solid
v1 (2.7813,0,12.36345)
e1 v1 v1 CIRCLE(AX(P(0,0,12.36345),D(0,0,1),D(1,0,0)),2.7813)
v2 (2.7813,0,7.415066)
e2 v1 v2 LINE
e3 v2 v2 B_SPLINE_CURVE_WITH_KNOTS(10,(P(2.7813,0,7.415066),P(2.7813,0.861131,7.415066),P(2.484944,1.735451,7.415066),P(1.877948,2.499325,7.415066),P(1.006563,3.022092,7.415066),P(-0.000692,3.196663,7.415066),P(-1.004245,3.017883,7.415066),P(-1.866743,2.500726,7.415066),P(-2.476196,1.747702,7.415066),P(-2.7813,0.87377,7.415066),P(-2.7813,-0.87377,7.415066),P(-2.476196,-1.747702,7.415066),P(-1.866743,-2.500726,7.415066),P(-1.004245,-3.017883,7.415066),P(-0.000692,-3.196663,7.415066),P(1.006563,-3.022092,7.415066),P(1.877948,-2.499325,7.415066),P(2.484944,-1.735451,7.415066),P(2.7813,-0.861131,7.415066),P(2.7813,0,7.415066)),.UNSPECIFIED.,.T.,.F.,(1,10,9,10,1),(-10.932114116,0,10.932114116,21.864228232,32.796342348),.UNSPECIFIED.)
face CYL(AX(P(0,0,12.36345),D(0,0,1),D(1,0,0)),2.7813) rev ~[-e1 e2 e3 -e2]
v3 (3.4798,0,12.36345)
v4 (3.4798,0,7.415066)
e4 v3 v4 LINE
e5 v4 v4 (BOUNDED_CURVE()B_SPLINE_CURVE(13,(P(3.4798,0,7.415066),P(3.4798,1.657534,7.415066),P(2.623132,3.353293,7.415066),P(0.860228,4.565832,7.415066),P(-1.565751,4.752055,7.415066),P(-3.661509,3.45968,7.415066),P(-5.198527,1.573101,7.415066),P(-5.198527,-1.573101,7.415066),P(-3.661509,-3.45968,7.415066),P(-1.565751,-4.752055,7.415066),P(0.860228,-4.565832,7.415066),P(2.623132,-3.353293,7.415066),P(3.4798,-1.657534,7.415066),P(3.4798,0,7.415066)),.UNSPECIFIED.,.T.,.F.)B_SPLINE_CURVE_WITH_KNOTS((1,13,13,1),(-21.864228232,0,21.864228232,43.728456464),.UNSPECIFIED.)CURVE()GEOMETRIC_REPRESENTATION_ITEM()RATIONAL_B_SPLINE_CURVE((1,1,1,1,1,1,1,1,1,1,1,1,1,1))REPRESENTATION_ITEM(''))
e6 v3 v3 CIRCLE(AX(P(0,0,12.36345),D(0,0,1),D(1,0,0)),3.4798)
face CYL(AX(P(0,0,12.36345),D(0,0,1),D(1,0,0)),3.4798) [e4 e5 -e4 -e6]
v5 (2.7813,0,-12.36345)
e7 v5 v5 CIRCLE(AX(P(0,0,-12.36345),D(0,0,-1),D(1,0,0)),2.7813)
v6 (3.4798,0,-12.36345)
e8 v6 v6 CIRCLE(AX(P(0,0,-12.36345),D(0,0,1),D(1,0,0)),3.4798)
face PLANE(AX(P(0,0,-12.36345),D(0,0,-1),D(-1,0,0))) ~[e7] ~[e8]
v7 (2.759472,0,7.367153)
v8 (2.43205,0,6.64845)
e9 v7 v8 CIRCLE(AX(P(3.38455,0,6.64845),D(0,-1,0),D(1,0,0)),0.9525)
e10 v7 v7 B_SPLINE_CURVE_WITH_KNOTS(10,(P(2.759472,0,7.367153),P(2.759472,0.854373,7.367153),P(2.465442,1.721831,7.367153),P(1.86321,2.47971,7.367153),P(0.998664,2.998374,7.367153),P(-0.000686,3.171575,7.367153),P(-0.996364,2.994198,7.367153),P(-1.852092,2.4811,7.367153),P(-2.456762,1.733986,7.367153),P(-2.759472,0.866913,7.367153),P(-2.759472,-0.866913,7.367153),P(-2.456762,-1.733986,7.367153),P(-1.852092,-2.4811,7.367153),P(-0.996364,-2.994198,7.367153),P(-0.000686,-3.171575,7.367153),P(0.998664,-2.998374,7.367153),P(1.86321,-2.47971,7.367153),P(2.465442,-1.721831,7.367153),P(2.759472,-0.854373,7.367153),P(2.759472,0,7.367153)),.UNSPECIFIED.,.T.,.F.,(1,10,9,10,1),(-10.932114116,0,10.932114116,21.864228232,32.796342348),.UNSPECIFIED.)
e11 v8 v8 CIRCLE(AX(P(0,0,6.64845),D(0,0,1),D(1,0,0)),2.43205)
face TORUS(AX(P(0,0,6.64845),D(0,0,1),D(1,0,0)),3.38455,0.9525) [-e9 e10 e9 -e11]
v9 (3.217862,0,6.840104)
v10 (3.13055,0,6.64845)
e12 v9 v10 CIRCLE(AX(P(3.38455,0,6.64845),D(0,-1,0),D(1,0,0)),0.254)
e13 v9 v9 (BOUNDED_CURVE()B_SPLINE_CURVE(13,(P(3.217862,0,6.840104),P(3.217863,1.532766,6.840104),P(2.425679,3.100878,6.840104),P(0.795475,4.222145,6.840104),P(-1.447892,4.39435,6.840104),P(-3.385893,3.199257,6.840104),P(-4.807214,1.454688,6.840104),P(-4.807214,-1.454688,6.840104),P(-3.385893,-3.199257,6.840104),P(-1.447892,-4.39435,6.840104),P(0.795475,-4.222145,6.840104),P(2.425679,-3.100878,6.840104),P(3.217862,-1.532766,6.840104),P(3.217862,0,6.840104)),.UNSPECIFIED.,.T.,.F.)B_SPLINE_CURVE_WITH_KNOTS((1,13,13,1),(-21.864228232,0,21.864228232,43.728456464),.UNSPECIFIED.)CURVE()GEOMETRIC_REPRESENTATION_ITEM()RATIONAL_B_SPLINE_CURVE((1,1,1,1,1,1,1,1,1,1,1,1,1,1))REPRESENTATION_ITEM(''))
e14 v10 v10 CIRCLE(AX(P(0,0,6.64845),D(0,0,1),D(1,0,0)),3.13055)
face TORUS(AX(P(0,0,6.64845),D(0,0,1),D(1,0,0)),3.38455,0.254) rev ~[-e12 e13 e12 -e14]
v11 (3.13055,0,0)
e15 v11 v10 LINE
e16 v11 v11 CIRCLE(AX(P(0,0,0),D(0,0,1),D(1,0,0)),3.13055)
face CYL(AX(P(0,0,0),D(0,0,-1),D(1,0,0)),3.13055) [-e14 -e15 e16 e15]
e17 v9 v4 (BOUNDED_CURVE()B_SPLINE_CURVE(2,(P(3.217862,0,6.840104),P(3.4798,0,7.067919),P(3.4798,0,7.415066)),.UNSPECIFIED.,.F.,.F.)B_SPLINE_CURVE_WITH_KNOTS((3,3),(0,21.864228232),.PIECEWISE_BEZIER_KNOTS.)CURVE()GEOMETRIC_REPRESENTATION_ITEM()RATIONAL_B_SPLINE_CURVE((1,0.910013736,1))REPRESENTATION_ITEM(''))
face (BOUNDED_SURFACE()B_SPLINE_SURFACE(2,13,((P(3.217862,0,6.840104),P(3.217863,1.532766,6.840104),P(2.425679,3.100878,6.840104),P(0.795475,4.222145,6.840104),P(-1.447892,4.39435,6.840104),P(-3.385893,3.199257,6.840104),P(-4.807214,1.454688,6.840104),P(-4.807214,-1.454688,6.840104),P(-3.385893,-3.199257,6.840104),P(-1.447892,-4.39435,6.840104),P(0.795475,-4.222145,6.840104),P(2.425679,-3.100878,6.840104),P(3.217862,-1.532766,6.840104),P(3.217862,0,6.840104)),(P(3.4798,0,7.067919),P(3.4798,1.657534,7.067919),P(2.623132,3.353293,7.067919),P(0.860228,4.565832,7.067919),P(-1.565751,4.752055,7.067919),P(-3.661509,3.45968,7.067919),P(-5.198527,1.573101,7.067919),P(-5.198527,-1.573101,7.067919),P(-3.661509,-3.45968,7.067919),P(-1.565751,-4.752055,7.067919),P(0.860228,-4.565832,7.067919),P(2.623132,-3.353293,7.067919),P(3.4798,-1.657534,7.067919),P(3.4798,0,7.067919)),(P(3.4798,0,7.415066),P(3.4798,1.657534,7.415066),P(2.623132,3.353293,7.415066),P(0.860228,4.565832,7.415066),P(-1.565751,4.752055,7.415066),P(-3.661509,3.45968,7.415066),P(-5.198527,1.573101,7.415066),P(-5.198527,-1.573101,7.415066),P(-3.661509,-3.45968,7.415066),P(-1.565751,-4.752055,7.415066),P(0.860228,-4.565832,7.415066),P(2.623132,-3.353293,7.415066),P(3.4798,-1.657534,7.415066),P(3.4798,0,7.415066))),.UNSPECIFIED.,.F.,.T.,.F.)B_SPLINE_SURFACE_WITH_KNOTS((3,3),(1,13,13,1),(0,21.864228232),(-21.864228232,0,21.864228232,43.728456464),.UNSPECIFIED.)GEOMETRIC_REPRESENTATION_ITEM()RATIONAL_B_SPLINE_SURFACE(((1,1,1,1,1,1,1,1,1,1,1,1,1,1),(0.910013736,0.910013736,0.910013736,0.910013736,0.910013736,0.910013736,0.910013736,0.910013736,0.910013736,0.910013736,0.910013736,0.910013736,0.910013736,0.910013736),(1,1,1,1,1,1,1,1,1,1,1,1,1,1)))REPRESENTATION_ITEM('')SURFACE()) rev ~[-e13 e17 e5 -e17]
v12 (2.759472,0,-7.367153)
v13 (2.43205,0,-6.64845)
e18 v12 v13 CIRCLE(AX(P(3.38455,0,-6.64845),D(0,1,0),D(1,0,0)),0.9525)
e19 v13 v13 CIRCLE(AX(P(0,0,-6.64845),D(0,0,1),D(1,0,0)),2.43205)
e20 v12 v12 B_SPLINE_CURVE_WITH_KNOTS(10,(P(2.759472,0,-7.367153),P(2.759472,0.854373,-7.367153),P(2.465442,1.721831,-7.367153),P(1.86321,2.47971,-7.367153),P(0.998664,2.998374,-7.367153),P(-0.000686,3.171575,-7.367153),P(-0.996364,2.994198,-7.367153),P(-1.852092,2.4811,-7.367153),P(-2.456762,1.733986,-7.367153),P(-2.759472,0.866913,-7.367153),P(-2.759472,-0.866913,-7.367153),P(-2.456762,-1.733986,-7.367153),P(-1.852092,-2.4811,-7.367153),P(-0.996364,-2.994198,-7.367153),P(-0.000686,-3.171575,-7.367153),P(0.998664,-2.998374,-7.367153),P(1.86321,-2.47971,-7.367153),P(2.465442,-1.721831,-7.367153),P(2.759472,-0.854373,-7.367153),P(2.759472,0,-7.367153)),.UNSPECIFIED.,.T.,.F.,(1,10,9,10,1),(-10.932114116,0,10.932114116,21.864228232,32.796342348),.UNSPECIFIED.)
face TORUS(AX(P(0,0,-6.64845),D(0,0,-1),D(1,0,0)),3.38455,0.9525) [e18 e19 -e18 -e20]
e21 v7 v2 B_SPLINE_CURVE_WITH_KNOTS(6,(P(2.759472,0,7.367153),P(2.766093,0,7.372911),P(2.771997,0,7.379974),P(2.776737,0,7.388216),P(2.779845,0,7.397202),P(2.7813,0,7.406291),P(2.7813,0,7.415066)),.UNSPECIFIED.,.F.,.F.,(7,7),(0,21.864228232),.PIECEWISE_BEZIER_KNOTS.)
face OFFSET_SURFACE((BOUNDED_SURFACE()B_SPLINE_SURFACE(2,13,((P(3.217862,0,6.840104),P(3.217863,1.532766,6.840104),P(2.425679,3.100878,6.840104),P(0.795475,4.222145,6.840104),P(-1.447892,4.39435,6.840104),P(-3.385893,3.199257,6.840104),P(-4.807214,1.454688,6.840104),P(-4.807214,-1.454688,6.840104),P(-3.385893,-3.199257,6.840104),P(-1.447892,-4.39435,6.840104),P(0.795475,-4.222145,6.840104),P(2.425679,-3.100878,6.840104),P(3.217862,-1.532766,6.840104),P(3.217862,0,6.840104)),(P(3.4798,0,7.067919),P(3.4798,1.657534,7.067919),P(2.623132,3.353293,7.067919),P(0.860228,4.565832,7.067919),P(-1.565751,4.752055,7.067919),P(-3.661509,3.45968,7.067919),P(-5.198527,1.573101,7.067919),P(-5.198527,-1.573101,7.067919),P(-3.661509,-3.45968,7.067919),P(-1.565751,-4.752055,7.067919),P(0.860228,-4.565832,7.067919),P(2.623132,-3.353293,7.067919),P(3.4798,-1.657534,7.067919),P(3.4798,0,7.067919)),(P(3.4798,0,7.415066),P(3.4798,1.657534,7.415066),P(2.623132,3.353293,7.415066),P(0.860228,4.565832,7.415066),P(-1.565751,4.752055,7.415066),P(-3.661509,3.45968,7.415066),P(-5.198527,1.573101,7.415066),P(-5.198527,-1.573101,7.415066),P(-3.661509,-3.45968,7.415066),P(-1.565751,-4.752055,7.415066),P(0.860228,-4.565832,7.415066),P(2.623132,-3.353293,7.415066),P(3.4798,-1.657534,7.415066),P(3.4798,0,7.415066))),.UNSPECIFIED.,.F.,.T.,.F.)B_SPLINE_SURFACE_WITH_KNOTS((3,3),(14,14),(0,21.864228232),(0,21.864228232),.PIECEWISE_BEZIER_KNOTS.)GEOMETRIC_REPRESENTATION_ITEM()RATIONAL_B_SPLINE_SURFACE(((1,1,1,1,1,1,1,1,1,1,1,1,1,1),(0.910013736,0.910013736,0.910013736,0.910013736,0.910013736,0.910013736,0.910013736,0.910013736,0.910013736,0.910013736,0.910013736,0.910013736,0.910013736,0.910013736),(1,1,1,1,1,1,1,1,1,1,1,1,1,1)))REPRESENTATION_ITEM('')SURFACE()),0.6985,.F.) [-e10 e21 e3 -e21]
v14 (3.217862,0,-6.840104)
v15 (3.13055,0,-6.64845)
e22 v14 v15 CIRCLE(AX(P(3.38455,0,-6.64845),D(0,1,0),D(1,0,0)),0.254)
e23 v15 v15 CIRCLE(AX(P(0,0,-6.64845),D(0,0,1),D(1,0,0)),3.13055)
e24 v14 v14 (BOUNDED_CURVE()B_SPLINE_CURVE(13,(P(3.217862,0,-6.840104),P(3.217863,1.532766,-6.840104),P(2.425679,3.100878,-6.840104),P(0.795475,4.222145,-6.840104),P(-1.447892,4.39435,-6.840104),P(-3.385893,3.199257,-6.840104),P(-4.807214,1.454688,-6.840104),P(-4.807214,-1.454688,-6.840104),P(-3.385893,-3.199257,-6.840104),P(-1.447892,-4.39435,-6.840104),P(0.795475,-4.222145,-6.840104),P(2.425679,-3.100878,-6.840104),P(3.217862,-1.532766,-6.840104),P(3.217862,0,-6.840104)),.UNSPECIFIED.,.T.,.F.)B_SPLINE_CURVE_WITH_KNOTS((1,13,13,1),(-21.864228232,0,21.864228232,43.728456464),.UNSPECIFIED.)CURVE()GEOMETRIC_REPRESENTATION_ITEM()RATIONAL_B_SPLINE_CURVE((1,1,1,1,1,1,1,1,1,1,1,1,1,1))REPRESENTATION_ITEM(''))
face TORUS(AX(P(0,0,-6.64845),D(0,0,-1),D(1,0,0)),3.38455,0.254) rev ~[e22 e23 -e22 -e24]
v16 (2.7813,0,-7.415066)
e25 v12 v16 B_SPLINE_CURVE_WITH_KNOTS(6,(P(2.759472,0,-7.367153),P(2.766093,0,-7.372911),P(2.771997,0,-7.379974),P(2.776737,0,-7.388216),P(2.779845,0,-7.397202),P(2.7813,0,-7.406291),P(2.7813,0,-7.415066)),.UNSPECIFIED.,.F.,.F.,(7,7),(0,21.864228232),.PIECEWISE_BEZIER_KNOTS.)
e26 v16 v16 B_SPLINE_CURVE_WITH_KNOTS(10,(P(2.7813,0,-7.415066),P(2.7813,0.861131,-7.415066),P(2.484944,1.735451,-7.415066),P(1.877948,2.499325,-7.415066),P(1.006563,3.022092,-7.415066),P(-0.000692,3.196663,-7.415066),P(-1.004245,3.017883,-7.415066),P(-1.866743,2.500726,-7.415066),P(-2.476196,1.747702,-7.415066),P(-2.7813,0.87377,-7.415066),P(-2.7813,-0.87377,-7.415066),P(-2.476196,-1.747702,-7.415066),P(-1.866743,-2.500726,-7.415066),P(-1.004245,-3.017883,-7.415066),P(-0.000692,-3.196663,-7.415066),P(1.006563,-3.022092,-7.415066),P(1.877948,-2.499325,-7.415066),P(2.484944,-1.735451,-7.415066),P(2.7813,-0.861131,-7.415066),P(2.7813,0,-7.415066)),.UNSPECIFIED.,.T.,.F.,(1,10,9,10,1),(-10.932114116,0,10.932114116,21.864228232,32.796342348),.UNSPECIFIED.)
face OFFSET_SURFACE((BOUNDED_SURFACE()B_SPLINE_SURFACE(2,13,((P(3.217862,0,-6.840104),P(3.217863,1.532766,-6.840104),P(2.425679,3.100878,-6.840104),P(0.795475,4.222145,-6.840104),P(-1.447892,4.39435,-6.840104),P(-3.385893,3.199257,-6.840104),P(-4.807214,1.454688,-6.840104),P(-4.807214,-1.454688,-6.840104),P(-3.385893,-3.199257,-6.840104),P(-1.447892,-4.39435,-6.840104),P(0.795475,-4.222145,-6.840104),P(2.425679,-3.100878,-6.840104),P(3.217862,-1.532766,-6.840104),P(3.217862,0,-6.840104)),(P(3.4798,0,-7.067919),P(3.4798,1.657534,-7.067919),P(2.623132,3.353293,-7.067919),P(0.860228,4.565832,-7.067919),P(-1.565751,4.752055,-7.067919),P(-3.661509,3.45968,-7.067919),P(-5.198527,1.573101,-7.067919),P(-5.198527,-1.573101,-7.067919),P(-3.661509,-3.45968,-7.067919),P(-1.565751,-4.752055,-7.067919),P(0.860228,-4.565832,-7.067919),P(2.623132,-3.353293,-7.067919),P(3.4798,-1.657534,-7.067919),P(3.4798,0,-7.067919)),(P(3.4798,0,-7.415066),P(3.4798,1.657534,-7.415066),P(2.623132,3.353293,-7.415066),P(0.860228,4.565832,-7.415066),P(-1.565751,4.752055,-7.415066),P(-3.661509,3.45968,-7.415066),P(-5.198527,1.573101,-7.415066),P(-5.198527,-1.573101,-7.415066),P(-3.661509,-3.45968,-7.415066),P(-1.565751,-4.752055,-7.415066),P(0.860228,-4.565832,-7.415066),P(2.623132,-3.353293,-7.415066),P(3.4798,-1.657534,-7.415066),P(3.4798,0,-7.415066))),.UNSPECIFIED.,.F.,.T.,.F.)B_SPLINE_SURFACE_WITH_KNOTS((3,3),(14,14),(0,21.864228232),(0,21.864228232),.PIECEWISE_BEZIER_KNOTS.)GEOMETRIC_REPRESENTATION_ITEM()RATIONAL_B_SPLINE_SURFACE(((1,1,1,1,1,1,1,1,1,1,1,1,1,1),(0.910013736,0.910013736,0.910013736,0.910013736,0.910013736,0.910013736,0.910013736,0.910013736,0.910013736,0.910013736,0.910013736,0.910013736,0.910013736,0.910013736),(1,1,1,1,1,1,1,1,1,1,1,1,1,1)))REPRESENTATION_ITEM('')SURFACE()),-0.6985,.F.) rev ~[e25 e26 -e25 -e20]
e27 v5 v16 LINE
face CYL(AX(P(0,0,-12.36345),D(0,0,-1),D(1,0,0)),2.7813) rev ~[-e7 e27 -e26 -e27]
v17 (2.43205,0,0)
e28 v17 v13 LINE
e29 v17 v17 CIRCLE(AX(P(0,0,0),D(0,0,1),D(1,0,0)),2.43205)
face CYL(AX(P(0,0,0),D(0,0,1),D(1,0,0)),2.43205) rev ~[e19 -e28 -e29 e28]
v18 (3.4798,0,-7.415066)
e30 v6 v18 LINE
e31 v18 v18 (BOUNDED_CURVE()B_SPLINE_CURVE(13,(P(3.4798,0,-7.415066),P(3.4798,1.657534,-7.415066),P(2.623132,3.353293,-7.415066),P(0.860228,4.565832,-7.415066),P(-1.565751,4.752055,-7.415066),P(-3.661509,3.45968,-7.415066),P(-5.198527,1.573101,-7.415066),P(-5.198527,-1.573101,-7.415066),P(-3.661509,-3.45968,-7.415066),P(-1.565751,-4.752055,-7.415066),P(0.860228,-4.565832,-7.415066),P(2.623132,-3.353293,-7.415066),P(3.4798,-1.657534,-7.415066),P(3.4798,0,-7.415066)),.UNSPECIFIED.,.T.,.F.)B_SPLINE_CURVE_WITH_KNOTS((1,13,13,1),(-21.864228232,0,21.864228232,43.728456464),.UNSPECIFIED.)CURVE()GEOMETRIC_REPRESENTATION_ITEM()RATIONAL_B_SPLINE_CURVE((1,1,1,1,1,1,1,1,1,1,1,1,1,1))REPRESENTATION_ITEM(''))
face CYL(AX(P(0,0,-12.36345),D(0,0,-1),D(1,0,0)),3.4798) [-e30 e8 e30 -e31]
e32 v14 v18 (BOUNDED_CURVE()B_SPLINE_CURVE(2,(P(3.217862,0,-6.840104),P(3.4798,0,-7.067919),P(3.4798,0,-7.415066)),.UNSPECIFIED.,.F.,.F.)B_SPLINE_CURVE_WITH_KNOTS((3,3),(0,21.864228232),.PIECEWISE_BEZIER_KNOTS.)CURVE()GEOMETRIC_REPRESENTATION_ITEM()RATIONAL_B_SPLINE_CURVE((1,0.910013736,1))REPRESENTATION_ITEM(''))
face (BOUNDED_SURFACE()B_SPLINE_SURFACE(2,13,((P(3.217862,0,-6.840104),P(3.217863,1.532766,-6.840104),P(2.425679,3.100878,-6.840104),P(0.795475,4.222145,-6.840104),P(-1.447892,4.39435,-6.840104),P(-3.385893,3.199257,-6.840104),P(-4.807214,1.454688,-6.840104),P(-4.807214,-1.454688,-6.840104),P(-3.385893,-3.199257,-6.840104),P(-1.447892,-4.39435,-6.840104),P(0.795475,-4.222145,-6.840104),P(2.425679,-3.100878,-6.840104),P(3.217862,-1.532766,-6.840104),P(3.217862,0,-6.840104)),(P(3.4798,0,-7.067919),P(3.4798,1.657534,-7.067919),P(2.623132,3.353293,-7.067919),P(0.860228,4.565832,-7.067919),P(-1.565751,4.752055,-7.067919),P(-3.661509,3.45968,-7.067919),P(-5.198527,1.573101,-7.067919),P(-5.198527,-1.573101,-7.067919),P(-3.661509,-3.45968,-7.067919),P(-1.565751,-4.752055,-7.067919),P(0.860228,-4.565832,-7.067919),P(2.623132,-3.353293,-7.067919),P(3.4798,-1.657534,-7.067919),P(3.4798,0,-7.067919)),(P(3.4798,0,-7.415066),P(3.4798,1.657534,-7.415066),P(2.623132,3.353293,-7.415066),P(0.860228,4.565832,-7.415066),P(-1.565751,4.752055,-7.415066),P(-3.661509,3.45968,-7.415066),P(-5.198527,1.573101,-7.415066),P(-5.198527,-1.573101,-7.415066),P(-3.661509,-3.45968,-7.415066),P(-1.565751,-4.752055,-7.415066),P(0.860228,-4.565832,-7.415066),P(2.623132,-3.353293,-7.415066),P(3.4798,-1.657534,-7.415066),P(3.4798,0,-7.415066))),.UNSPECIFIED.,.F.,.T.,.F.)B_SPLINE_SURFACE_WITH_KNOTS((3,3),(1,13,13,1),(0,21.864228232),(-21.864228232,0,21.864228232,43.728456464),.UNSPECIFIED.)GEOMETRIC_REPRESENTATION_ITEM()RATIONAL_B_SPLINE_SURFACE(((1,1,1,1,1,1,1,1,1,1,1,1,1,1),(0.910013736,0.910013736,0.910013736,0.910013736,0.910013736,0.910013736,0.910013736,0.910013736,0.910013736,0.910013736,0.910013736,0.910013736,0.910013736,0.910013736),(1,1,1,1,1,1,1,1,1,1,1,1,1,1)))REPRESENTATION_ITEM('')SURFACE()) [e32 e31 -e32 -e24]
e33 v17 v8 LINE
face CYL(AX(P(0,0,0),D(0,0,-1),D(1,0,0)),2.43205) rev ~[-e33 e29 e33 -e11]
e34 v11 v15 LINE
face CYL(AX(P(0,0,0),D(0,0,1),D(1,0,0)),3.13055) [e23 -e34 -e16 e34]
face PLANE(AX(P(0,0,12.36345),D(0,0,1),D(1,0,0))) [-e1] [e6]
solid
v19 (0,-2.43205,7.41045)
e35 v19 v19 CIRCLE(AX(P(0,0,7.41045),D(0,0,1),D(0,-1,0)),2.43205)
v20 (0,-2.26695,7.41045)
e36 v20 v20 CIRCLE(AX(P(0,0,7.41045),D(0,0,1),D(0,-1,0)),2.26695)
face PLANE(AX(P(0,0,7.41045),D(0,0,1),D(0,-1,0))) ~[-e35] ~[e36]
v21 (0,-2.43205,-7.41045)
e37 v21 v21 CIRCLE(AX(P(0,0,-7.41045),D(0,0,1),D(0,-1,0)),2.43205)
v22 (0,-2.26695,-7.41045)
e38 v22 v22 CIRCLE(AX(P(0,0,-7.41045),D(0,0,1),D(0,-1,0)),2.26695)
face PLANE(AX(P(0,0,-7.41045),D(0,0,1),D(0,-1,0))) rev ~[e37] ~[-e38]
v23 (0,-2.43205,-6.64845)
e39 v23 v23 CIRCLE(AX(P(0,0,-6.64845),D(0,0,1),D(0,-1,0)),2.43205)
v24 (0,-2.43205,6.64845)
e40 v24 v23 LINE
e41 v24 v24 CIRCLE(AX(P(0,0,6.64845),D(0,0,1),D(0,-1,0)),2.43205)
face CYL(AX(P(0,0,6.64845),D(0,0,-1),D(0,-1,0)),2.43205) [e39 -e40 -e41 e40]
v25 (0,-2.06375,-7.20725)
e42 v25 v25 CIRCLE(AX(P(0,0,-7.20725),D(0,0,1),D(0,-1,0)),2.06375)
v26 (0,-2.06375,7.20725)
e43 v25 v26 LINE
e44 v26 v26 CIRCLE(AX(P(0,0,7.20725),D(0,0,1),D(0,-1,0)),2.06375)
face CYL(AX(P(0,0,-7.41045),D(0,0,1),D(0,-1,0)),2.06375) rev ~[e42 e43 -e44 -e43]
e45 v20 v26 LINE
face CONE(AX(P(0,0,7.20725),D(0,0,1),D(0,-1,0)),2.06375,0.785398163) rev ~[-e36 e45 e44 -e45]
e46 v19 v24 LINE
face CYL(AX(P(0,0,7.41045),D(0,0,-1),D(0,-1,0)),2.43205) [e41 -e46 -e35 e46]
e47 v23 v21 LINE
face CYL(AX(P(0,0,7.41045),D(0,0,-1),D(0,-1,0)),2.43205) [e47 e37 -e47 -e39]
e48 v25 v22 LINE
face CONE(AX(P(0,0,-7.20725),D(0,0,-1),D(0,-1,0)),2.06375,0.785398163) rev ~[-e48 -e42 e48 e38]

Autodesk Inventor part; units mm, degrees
ref_plane "YZ Plane" through (0, 0, 0) normal (1, 0, 0) x (0, 1, 0)
ref_plane "XZ Plane" through (0, 0, 0) normal (0, 1, 0) x (-1, 0, 0)
ref_plane "XY Plane" through (0, 0, 0) normal (0, 0, 1) x (1, 0, 0)
sketch "Sketch1" plane through (0, 0, 0) normal (0, 0, 1) x (1, 0, 0)
  circle A0 centre (0, 0) radius 3.13055
  dimension "d0" = 6.2611
extrude "Extrusion1" add sketch "Sketch1" along normal mid plane 24.7269
sketch "Sketch2" plane through (0, 0, 12.36345) normal (0, 0, 1) x (1, 0, 0)
  circle A0 centre (0, 0) radius 3.13055
  circle A1 centre (0, 0) radius 3.4798
  dimension "d3" = 6.9596
extrude "Extrusion2" add sketch "Sketch2" against normal blind 5.461
fillet "Fillet1" radius 0.254 1 edges at (-3.1305, 0, 6.9024)
fillet "Fillet2" radius 0.762 1 edges at (-3.4798, 0, 6.9024)
mirror "Mirror1" about plane through (0, 0, 0) normal (0, 0, 1) of "Extrusion2", "Fillet1", "Fillet2"
shell "Shell1" thickness 0.6985 removed faces 2 at (0.449612, -0.769178, -12.36345) at (0.449612, -0.769178, 12.36345)
sketch "Sketch3" plane through (0, 0, 0) normal (1, 0, 0) x (0, 1, 0)
  line L0 (-3.4798, 7.415066) -> (-3.4798, 12.36345)
  line L1 (-3.4798, 12.36345) -> (-2.7813, 12.36345)
  line L2 (-2.7813, 12.36345) -> (-2.7813, 7.415066)
  line L3 (-2.43205, 6.64845) -> (-2.43205, -6.64845)
  line L4 (-2.7813, -7.415066) -> (-2.7813, -12.36345)
  line L5 (-2.7813, -12.36345) -> (-3.4798, -12.36345)
  line L6 (-3.4798, -12.36345) -> (-3.4798, -7.415066)
  arc A0 (-3.217862, -6.840104) -> (-3.13055, -6.64845) centre (-3.38455, -6.64845) ccw
  line L7 (-3.13055, -6.64845) -> (-3.13055, 6.64845)
  arc A1 (-3.13055, 6.64845) -> (-3.217862, 6.840104) centre (-3.38455, 6.64845) ccw
  arc A2 (3.217862, 6.840104) -> (3.13055, 6.64845) centre (3.38455, 6.64845) ccw
  line L8 (3.13055, 6.64845) -> (3.13055, -6.64845)
  arc A3 (3.13055, -6.64845) -> (3.217862, -6.840104) centre (3.38455, -6.64845) ccw
  line L9 (3.4798, -7.415066) -> (3.4798, -12.36345)
  line L10 (3.4798, -12.36345) -> (2.7813, -12.36345)
  line L11 (2.7813, -12.36345) -> (2.7813, -7.415066)
  line L12 (2.43205, -6.64845) -> (2.43205, 6.64845)
  line L13 (2.7813, 7.415066) -> (2.7813, 12.36345)
  line L14 (2.7813, 12.36345) -> (3.4798, 12.36345)
  line L15 (3.4798, 12.36345) -> (3.4798, 7.415066)
  line L16 (-2.43205, -7.41045) -> (-2.06375, -7.41045)
  line L17 (-2.06375, -7.41045) -> (-2.06375, 7.41045)
  line L18 (-2.06375, 7.41045) -> (-2.43205, 7.41045)
  line L19 (-2.43205, 7.41045) -> (-2.43205, -7.41045)
  line L20 (0, -17.30883) -> (0, 17.30883)
  arc A4 (-3.4798, 7.415066) -> (-3.217862, 6.840104) centre (-2.7178, 7.415066) ccw
  arc A5 (-2.7813, 7.415066) -> (-2.759472, 7.367153) centre (-2.7178, 7.415066) ccw
  arc A6 (-2.43205, 6.64845) -> (-2.759472, 7.367153) centre (-3.38455, 6.64845) ccw
  arc A7 (-2.759472, -7.367153) -> (-2.43205, -6.64845) centre (-3.38455, -6.64845) ccw
  arc A8 (-2.759472, -7.367153) -> (-2.7813, -7.415066) centre (-2.7178, -7.415066) ccw
  arc A9 (-3.217862, -6.840104) -> (-3.4798, -7.415066) centre (-2.7178, -7.415066) ccw
  arc A10 (3.217862, 6.840104) -> (3.4798, 7.415066) centre (2.7178, 7.415066) ccw
  arc A11 (3.4798, -7.415066) -> (3.217862, -6.840104) centre (2.7178, -7.415066) ccw
  arc A12 (2.7813, -7.415066) -> (2.759472, -7.367153) centre (2.7178, -7.415066) ccw
  arc A13 (2.43205, -6.64845) -> (2.759472, -7.367153) centre (3.38455, -6.64845) ccw
  arc A14 (2.759472, 7.367153) -> (2.43205, 6.64845) centre (3.38455, 6.64845) ccw
  arc A15 (2.759472, 7.367153) -> (2.7813, 7.415066) centre (2.7178, 7.415066) ccw
  point P0 (0, 0)
  dimension "d9" = 0.3683
  dimension "d10" = 0.762
  dimension "d11" = 0.762
revolve "Revolution1" add sketch "Sketch3" angle 360 about axis through (0, 0, -10) along (0, 0, 1) separate body contours L19 L18 L17 L16 L3
chamfer "Chamfer1" distance 0.2032 angle 45 2 edges at (0, 2.0638, 7.4105) (0, 2.0637, -7.4105)
properties part number "12-10 double sided female tube yellow"
